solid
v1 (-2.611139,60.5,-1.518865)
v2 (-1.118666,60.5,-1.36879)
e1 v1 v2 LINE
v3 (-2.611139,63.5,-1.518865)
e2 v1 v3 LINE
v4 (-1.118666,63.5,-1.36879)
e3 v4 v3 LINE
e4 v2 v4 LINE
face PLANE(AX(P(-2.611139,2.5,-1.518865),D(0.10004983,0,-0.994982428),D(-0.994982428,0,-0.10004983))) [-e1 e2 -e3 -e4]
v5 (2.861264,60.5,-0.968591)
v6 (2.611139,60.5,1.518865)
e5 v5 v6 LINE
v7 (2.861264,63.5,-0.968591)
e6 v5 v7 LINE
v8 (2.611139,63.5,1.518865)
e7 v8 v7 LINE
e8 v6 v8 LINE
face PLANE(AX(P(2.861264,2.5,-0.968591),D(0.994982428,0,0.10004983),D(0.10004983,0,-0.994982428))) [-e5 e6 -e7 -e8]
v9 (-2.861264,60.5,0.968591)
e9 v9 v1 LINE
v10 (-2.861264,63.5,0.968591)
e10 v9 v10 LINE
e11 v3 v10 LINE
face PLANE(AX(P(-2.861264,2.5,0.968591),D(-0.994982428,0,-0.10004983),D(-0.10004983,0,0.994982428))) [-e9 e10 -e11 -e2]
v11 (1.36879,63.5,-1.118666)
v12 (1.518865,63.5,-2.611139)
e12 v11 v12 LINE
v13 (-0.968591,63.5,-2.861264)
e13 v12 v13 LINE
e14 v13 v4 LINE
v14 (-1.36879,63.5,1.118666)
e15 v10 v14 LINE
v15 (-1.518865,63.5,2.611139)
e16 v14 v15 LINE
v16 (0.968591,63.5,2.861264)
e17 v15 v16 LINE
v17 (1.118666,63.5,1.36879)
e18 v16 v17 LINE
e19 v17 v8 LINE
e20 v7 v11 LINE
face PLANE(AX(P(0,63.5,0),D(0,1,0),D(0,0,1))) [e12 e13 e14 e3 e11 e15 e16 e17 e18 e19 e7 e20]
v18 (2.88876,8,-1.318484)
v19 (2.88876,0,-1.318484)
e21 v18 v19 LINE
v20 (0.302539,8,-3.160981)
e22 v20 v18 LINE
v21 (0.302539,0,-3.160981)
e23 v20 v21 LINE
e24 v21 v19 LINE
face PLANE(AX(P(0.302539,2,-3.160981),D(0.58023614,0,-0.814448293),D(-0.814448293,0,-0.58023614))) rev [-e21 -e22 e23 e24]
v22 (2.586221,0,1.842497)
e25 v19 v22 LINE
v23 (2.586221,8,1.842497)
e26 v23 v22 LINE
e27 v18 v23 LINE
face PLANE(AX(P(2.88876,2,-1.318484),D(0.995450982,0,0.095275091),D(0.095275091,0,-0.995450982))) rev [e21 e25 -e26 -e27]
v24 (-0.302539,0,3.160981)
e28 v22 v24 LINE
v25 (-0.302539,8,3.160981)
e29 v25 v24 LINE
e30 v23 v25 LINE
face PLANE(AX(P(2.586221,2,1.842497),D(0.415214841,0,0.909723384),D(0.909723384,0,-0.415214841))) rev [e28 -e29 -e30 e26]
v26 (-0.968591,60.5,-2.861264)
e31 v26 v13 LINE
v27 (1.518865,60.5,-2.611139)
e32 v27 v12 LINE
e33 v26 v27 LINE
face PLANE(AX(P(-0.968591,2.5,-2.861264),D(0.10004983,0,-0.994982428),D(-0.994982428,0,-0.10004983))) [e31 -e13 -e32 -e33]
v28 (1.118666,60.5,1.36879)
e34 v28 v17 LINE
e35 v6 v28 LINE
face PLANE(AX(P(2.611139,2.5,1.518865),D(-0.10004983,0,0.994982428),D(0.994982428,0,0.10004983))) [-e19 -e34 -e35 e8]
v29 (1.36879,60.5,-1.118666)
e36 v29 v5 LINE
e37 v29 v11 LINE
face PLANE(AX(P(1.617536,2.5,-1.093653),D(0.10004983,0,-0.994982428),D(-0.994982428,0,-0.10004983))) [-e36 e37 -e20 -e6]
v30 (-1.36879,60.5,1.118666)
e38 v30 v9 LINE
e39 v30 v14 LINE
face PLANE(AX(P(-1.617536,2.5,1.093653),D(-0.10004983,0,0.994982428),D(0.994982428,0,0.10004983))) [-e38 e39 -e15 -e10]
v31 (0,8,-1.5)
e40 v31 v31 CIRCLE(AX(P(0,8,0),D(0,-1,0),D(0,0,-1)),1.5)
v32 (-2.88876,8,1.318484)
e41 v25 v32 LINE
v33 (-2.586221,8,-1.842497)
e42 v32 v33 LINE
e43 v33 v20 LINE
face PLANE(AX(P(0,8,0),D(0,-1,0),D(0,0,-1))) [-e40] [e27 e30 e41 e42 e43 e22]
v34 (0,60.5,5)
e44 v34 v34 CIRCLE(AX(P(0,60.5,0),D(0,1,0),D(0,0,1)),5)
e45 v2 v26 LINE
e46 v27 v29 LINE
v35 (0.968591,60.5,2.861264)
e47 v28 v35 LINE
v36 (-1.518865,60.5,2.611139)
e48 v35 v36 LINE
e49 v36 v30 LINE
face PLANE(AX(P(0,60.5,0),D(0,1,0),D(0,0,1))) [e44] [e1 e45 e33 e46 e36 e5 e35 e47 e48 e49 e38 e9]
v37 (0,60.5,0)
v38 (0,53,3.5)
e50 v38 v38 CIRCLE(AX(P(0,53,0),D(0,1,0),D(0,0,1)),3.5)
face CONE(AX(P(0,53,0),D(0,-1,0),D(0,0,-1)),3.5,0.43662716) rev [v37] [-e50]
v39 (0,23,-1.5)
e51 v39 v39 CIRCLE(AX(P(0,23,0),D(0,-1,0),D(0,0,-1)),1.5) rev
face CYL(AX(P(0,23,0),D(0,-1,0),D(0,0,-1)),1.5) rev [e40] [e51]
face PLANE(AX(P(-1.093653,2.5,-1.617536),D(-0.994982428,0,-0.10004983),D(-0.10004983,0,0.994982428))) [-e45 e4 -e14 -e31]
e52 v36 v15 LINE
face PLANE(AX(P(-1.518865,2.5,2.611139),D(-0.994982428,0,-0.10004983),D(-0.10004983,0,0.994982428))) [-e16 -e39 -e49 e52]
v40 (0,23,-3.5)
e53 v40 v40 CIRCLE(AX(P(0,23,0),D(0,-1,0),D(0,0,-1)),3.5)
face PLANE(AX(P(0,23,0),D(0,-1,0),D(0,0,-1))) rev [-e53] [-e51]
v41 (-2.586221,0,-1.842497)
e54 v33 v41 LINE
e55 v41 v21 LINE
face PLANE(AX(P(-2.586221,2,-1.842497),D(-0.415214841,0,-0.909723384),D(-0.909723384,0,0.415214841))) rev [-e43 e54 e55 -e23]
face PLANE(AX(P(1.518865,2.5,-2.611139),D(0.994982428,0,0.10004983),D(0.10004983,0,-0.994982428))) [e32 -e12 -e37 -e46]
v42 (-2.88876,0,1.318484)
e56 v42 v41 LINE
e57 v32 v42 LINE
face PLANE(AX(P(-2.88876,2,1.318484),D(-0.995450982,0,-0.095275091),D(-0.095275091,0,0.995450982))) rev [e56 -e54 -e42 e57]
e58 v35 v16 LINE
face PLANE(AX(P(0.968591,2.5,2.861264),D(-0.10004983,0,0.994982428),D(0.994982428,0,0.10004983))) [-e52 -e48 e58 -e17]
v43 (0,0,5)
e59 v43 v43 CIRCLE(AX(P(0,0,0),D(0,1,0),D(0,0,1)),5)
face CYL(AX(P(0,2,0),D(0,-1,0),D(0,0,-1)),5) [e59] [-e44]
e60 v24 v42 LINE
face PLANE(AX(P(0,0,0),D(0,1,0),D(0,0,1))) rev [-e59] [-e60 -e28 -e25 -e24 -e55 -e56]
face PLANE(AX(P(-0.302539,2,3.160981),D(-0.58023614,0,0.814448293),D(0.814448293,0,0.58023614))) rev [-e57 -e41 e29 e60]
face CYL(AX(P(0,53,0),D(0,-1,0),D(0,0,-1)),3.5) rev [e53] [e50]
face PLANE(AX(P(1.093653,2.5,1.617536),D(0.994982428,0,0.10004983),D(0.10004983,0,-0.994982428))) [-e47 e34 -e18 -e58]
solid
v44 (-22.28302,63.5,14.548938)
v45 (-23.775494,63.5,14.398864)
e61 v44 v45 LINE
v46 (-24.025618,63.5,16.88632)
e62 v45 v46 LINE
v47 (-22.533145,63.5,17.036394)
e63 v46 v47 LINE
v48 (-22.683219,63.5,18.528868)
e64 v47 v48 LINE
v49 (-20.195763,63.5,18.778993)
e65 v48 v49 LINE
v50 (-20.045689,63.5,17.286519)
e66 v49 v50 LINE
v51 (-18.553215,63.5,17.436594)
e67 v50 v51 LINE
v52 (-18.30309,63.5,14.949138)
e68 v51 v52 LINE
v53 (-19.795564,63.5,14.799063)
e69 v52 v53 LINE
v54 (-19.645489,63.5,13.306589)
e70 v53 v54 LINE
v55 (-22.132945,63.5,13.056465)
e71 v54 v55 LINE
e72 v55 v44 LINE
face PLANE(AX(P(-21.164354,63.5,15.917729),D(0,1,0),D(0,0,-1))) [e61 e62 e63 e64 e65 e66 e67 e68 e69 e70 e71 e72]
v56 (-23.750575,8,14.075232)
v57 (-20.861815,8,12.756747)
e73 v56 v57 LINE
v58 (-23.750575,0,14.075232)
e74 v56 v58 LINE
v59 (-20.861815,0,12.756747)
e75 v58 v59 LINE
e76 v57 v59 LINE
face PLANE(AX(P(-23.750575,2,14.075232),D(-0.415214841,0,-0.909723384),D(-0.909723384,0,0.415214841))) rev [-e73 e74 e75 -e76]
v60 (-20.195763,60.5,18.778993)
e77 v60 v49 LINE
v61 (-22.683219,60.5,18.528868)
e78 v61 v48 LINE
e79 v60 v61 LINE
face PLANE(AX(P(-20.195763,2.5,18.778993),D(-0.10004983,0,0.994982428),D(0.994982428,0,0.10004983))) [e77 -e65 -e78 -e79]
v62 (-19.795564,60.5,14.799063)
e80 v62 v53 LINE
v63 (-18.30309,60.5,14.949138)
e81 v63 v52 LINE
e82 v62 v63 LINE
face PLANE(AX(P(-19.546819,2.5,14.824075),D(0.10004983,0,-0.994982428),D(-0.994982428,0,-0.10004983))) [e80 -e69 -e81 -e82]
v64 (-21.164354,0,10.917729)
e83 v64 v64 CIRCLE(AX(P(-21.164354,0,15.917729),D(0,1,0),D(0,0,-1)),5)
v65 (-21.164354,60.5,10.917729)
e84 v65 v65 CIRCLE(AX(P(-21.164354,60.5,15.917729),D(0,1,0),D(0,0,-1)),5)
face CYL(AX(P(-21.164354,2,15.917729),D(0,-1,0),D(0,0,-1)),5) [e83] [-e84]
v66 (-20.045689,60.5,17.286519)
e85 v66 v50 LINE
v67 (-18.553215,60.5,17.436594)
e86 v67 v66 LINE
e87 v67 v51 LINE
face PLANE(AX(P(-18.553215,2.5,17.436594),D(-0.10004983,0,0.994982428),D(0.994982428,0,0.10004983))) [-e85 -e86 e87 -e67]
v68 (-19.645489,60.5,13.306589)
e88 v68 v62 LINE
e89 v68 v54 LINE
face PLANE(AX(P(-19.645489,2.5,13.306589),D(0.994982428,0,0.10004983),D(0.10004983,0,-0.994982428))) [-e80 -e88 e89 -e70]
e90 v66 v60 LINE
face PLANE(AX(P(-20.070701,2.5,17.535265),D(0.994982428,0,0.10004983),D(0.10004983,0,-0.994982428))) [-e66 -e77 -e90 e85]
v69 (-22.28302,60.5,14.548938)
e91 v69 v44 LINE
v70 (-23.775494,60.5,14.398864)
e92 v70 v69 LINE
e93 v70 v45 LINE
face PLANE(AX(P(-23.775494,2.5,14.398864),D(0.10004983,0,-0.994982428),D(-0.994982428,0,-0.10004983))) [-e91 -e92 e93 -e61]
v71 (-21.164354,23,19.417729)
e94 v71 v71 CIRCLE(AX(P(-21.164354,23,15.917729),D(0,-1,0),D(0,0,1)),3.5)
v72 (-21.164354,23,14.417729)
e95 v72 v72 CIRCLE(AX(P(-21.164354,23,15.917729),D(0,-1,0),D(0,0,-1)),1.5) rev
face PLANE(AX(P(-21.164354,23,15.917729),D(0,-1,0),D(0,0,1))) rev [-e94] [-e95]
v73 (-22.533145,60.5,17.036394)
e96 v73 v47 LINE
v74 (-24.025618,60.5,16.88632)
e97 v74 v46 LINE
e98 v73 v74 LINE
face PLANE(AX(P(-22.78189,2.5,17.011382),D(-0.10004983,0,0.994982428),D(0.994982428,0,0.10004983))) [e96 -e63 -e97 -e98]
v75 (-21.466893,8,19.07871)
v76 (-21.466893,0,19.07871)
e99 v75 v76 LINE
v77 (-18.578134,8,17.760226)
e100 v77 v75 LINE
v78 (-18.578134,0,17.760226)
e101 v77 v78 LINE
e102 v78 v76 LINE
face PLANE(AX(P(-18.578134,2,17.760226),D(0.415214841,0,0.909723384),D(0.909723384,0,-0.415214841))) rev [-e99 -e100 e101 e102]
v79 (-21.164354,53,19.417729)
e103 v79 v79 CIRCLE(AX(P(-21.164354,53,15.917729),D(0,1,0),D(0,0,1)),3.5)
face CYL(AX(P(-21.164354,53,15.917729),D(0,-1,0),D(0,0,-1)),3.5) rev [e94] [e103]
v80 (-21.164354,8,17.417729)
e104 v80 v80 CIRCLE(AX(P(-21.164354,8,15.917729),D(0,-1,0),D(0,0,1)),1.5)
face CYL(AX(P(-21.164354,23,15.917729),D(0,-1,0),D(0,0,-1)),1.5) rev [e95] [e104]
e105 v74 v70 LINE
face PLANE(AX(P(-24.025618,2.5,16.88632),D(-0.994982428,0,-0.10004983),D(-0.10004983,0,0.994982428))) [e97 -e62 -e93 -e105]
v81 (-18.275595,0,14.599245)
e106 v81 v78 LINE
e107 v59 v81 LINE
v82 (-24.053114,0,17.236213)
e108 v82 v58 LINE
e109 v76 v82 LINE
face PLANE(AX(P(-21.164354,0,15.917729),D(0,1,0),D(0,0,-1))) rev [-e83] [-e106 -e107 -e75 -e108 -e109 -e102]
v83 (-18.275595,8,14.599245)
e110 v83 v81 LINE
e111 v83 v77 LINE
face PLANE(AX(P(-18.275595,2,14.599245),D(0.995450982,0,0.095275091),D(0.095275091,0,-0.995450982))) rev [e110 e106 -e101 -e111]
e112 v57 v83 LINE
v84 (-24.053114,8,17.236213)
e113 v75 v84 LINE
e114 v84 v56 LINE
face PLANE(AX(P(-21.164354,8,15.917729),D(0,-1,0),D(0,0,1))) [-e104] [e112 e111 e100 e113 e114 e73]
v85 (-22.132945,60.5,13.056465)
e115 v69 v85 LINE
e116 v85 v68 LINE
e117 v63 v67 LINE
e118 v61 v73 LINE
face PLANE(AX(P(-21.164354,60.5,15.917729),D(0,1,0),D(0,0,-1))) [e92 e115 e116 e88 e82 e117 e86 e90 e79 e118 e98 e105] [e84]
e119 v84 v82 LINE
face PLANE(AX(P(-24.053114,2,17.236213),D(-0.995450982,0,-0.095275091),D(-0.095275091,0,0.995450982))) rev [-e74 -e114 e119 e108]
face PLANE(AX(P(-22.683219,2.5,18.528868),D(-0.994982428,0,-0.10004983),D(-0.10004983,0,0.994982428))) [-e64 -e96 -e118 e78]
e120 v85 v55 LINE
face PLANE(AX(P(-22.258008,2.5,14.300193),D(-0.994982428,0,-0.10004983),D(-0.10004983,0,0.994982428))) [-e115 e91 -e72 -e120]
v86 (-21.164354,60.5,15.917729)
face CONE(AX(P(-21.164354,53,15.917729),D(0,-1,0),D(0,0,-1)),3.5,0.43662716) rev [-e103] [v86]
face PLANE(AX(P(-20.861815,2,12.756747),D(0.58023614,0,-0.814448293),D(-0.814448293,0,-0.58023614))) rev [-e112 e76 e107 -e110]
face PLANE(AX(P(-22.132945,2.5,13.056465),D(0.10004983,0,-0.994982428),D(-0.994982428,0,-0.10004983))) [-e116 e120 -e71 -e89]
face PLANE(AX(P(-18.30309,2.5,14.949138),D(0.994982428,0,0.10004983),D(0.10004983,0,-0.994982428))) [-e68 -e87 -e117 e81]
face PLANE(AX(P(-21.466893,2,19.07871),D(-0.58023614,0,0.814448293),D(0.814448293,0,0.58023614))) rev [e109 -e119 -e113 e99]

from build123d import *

# Parameters (mm, degrees)
SKETCH_1_R               = 5
EXTRUDE_1_DEPTH          = 2
EXTRUDE_2_DEPTH          = 3.5
EXTRUDE_3_DEPTH          = 3.5
SKETCH_4_R               = 5
EXTRUDE_4_DEPTH          = 0.5
CUT_EXTRUDE_2_DEPTH      = 3
CUT_EXTRUDE_3_DEPTH      = 2
EXTRUDE_5_DEPTH          = 58
SKETCH_8_R               = 5
EXTRUDE_6_DEPTH          = 58
CUT_EXTRUDE_4_DEPTH      = 8
SKETCH_10_R              = 1.5
CUT_EXTRUDE_5_DEPTH      = 15
SKETCH_11_R              = 3.5
CUT_EXTRUDE_6_DEPTH      = 30
SKETCH_12_R              = 1
CUT_EXTRUDE_7_DEPTH      = 7
SKETCH_13_R              = 3.5
SKETCH_14_R              = 1
SKETCH_18_R              = 13.241072342
EXTRUDE_8_DEPTH          = 1
SKETCH_22_R              = 1.202046813
EXTRUDE_9_DEPTH          = 10
PATTERN_CIRCULAR_2_COUNT = 2
CUT_EXTRUDE_START        = -1
SKETCH_23_R              = 13.241072342
CUT_EXTRUDE_8_DEPTH      = 1
SKETCH_24_R              = 2.250567035
CUT_EXTRUDE_9_DEPTH      = 10


# Read off the part's stored shape, not the designer's step: 切除-扫描1
with BuildPart() as part:
    # 草图1 → 凸台-拉伸1 (new body)
    with BuildSketch(Plane(origin=(0, 0, 0), x_dir=(1, 0, 0), z_dir=(0, 1, 0))):
        with Locations(Location((0, 0, 0), (0, 0, 270))):
            Circle(SKETCH_1_R)
        Polygon((2.55392077, -1.838021228), (2.868733461, 1.292749652), (0.314812691, 3.13077088), (-2.55392077, 1.838021228), (-2.868733461, -1.292749652), (-0.314812691, -3.13077088), align=None, mode=Mode.SUBTRACT)
    extrude_1 = extrude(amount=EXTRUDE_1_DEPTH)

    # 草图2 → 凸台-拉伸2 (add)
    with BuildSketch(Plane(origin=(0, 2, 0), x_dir=(1, 0, 0), z_dir=(0, 1, 0))):
        Polygon((-2.834872538, 1.792623133), (3.135022029, 1.192324151), (2.834872538, -1.792623133), (-3.135022029, -1.192324151), align=None)
    extrude_2 = extrude(amount=EXTRUDE_2_DEPTH)

    # 草图3 → 凸台-拉伸3 (add)
    with BuildSketch(Plane(origin=(0, 2, 0), x_dir=(1, 0, 0), z_dir=(0, 1, 0))):
        Polygon((-1.192324151, 3.135022029), (-1.792623133, -2.834872538), (1.192324151, -3.135022029), (1.792623133, 2.834872538), align=None)
    extrude_3 = extrude(amount=EXTRUDE_3_DEPTH)

    # 草图4 → 凸台-拉伸4 (add)
    with BuildSketch(Plane(origin=(0, 2, 0), x_dir=(1, 0, 0), z_dir=(0, 1, 0))):
        with Locations(Location((0, 0, 0), (0, 0, 270))):
            Circle(SKETCH_4_R)
    extrude_4 = extrude(amount=EXTRUDE_4_DEPTH)

    # 草图5 → 切除-拉伸2 (cut)
    with BuildSketch(Plane(origin=(0, 5.5, 0), x_dir=(1, 0, 0), z_dir=(0, 1, 0))):
        Polygon((-3.135022029, -1.192324151), (-2.834872538, 1.792623133), (-1.342398896, 1.642548387), (-1.192324151, 3.135022029), (1.792623133, 2.834872538), (1.642548387, 1.342398896), (3.135022029, 1.192324151), (2.834872538, -1.792623133), (1.342398896, -1.642548387), (1.192324151, -3.135022029), (-1.792623133, -2.834872538), (-1.642548387, -1.342398896), align=None)
        Polygon((-1.093653289, 1.617535929), (-0.968591001, 2.861263964), (1.518865068, 2.611139388), (1.39380278, 1.367411354), (1.368790323, 1.118665747), (1.617535929, 1.093653289), (2.861263964, 0.968591001), (2.611139388, -1.518865068), (1.367411354, -1.39380278), (1.118665747, -1.368790323), (1.093653289, -1.617535929), (0.968591001, -2.861263964), (-1.518865068, -2.611139388), (-1.39380278, -1.367411354), (-1.368790323, -1.118665747), (-1.617535929, -1.093653289), (-2.861263964, -0.968591001), (-2.611139388, 1.518865068), (-1.367411354, 1.39380278), (-1.118665747, 1.368790323), align=None, mode=Mode.SUBTRACT)
    cut_extrude_2 = extrude(amount=-CUT_EXTRUDE_2_DEPTH, mode=Mode.SUBTRACT)

    # 草图6 → 切除-拉伸3 (cut)
    with BuildSketch(Plane.XZ):
        Polygon((2.888759724, -1.318484202), (2.586220675, 1.842497205), (-0.302539048, 3.160981407), (-2.888759724, 1.318484202), (-2.586220675, -1.842497205), (0.302539048, -3.160981407), align=None)
    cut_extrude_3 = extrude(amount=-CUT_EXTRUDE_3_DEPTH, mode=Mode.SUBTRACT)

    # 草图7 → 凸台-拉伸5 (add)
    with BuildSketch(Plane(origin=(0, 5.5, 0), x_dir=(1, 0, 0), z_dir=(0, 1, 0))):
        Polygon((-1.118665747, 1.368790323), (-0.968591001, 2.861263964), (1.518865068, 2.611139388), (1.368790323, 1.118665747), (2.861263964, 0.968591001), (2.611139388, -1.518865068), (1.118665747, -1.368790323), (0.968591001, -2.861263964), (-1.518865068, -2.611139388), (-1.368790323, -1.118665747), (-2.861263964, -0.968591001), (-2.611139388, 1.518865068), align=None)
    extrude_5 = extrude(amount=EXTRUDE_5_DEPTH)

    # 草图8 → 凸台-拉伸6 (add)
    with BuildSketch(Plane(origin=(0, 2.5, 0), x_dir=(1, 0, 0), z_dir=(0, 1, 0))):
        with Locations(Location((0, 0, 0), (0, 0, 270))):
            Circle(SKETCH_8_R)
    extrude_6 = extrude(amount=EXTRUDE_6_DEPTH)

    # 草图9 → 切除-拉伸4 (cut)
    with BuildSketch(Plane.XZ):
        Polygon((2.888759724, -1.318484202), (2.586220675, 1.842497205), (-0.302539048, 3.160981407), (-2.888759724, 1.318484202), (-2.586220675, -1.842497205), (0.302539048, -3.160981407), align=None)
    cut_extrude_4 = extrude(amount=-CUT_EXTRUDE_4_DEPTH, mode=Mode.SUBTRACT)

    # 草图10 → 切除-拉伸5 (cut)
    with BuildSketch(Plane.XZ.offset(-8)):
        with Locations(Location((0, 0, 0), (0, 0, 270))):
            Circle(SKETCH_10_R)
    cut_extrude_5 = extrude(amount=-CUT_EXTRUDE_5_DEPTH, mode=Mode.SUBTRACT)

    # 草图11 → 切除-拉伸6 (cut)
    with BuildSketch(Plane.XZ.offset(-23)):
        with Locations(Location((0, 0, 0), (0, 0, 270))):
            Circle(SKETCH_11_R)
    cut_extrude_6 = extrude(amount=-CUT_EXTRUDE_6_DEPTH, mode=Mode.SUBTRACT)

    # 草图12 → 切除-拉伸7 (cut)
    with BuildSketch(Plane.XZ.offset(-53)):
        with Locations(Location((0, 0, 0), (0, 0, 270))):
            Circle(SKETCH_12_R)
    cut_extrude_7 = extrude(amount=-CUT_EXTRUDE_7_DEPTH, mode=Mode.SUBTRACT)

    # 草图13 → 放样1 section 0
    with BuildSketch(Plane.XZ.offset(-53)):
        Circle(SKETCH_13_R)
    # 草图14 → 放样1 section 1
    with BuildSketch(Plane.XZ.offset(-60)):
        Circle(SKETCH_14_R)
    loft_1 = loft()

    # 切除-扫描1 outline → 切除-扫描1 (revolve, cut)
    with BuildSketch(Plane.XY):
        Polygon((3.5, 53), (0, 60.5), (0, 53), align=None)
    sweep_1 = revolve(axis=Axis((0, 0, 0), (0, 1, 0)), mode=Mode.SUBTRACT)

    # 草图18 → 凸台-拉伸8 (add)
    with BuildSketch(Plane(origin=(0, 0, 0), x_dir=(1, 0, 0), z_dir=(0, 1, 0))):
        with Locations(Location((-10.582177215, -7.958864376, 0), (0, 0, 270))):
            Circle(SKETCH_18_R)
    extrude(amount=-EXTRUDE_8_DEPTH)

    # 草图22 → 凸台-拉伸9 (add)
    with BuildSketch(Plane(origin=(0, 0, 0), x_dir=(1, 0, 0), z_dir=(0, 1, 0))):
        with Locations(Location((-10.582177215, -7.958864376, 0), (0, 0, 270))):
            Circle(SKETCH_22_R)
    extrude(amount=EXTRUDE_9_DEPTH)

    # 阵列(圆周)2: 凸台-拉伸1, 凸台-拉伸2, 凸台-拉伸3, 凸台-拉伸4, 切除-拉伸2, 切除-拉伸3, 凸台-拉伸5, 凸台-拉伸6, 切除-拉伸4, 切除-拉伸5, 切除-拉伸6, 切除-拉伸7, 放样1, 切除-扫描1 ×2 about axis
    pattern_circular_2_axis = Axis((-10.582177215, 0, 7.958864376), (0, 1, 0))
    add([extrude_1.rotate(pattern_circular_2_axis, i * 360 / PATTERN_CIRCULAR_2_COUNT) for i in range(1, PATTERN_CIRCULAR_2_COUNT)])
    add([extrude_2.rotate(pattern_circular_2_axis, i * 360 / PATTERN_CIRCULAR_2_COUNT) for i in range(1, PATTERN_CIRCULAR_2_COUNT)])
    add([extrude_3.rotate(pattern_circular_2_axis, i * 360 / PATTERN_CIRCULAR_2_COUNT) for i in range(1, PATTERN_CIRCULAR_2_COUNT)])
    add([extrude_4.rotate(pattern_circular_2_axis, i * 360 / PATTERN_CIRCULAR_2_COUNT) for i in range(1, PATTERN_CIRCULAR_2_COUNT)])
    add([cut_extrude_2.rotate(pattern_circular_2_axis, i * 360 / PATTERN_CIRCULAR_2_COUNT) for i in range(1, PATTERN_CIRCULAR_2_COUNT)], mode=Mode.SUBTRACT)
    add([cut_extrude_3.rotate(pattern_circular_2_axis, i * 360 / PATTERN_CIRCULAR_2_COUNT) for i in range(1, PATTERN_CIRCULAR_2_COUNT)], mode=Mode.SUBTRACT)
    add([extrude_5.rotate(pattern_circular_2_axis, i * 360 / PATTERN_CIRCULAR_2_COUNT) for i in range(1, PATTERN_CIRCULAR_2_COUNT)])
    add([extrude_6.rotate(pattern_circular_2_axis, i * 360 / PATTERN_CIRCULAR_2_COUNT) for i in range(1, PATTERN_CIRCULAR_2_COUNT)])
    add([cut_extrude_4.rotate(pattern_circular_2_axis, i * 360 / PATTERN_CIRCULAR_2_COUNT) for i in range(1, PATTERN_CIRCULAR_2_COUNT)], mode=Mode.SUBTRACT)
    add([cut_extrude_5.rotate(pattern_circular_2_axis, i * 360 / PATTERN_CIRCULAR_2_COUNT) for i in range(1, PATTERN_CIRCULAR_2_COUNT)], mode=Mode.SUBTRACT)
    add([cut_extrude_6.rotate(pattern_circular_2_axis, i * 360 / PATTERN_CIRCULAR_2_COUNT) for i in range(1, PATTERN_CIRCULAR_2_COUNT)], mode=Mode.SUBTRACT)
    add([cut_extrude_7.rotate(pattern_circular_2_axis, i * 360 / PATTERN_CIRCULAR_2_COUNT) for i in range(1, PATTERN_CIRCULAR_2_COUNT)], mode=Mode.SUBTRACT)
    add([loft_1.rotate(pattern_circular_2_axis, i * 360 / PATTERN_CIRCULAR_2_COUNT) for i in range(1, PATTERN_CIRCULAR_2_COUNT)])
    add([sweep_1.rotate(pattern_circular_2_axis, i * 360 / PATTERN_CIRCULAR_2_COUNT) for i in range(1, PATTERN_CIRCULAR_2_COUNT)], mode=Mode.SUBTRACT)

    # 草图23 → 切除-拉伸8 (cut)
    with BuildSketch(Plane.XZ.offset(1).offset(CUT_EXTRUDE_START)):
        with Locations((-10.582177215, 7.958864376)):
            Circle(SKETCH_23_R)
    extrude(amount=CUT_EXTRUDE_8_DEPTH, mode=Mode.SUBTRACT)


with BuildPart() as cut_extrude_8_piece_1:
    # of the separate pieces the step leaves, piece 1, a body of its own (cut_extrude_8_pieces)
    add(part.part.solids().sort_by_distance((0, 60.5, 5))[0])


with BuildPart() as cut_extrude_8_piece_2:
    # of the separate pieces the step leaves, piece 2, a body of its own (cut_extrude_8_pieces)
    add(part.part.solids().sort_by_distance((-21.16435443, 0, 10.917728752))[0])


with BuildPart() as cut_extrude_8_piece_3:
    # of the separate pieces the step leaves, piece 3, a body of its own (cut_extrude_8_pieces)
    add(part.part.solids().sort_by_distance((-10.582177215, 0, 9.160911189))[0])

    # 草图24 → 切除-拉伸9 (cut)
    with BuildSketch(Plane.XZ):
        with Locations((-10.582177215, 7.958864376)):
            Circle(SKETCH_24_R)
    extrude(amount=-CUT_EXTRUDE_9_DEPTH, mode=Mode.SUBTRACT)


solid = Compound([cut_extrude_8_piece_1.part, cut_extrude_8_piece_2.part])
